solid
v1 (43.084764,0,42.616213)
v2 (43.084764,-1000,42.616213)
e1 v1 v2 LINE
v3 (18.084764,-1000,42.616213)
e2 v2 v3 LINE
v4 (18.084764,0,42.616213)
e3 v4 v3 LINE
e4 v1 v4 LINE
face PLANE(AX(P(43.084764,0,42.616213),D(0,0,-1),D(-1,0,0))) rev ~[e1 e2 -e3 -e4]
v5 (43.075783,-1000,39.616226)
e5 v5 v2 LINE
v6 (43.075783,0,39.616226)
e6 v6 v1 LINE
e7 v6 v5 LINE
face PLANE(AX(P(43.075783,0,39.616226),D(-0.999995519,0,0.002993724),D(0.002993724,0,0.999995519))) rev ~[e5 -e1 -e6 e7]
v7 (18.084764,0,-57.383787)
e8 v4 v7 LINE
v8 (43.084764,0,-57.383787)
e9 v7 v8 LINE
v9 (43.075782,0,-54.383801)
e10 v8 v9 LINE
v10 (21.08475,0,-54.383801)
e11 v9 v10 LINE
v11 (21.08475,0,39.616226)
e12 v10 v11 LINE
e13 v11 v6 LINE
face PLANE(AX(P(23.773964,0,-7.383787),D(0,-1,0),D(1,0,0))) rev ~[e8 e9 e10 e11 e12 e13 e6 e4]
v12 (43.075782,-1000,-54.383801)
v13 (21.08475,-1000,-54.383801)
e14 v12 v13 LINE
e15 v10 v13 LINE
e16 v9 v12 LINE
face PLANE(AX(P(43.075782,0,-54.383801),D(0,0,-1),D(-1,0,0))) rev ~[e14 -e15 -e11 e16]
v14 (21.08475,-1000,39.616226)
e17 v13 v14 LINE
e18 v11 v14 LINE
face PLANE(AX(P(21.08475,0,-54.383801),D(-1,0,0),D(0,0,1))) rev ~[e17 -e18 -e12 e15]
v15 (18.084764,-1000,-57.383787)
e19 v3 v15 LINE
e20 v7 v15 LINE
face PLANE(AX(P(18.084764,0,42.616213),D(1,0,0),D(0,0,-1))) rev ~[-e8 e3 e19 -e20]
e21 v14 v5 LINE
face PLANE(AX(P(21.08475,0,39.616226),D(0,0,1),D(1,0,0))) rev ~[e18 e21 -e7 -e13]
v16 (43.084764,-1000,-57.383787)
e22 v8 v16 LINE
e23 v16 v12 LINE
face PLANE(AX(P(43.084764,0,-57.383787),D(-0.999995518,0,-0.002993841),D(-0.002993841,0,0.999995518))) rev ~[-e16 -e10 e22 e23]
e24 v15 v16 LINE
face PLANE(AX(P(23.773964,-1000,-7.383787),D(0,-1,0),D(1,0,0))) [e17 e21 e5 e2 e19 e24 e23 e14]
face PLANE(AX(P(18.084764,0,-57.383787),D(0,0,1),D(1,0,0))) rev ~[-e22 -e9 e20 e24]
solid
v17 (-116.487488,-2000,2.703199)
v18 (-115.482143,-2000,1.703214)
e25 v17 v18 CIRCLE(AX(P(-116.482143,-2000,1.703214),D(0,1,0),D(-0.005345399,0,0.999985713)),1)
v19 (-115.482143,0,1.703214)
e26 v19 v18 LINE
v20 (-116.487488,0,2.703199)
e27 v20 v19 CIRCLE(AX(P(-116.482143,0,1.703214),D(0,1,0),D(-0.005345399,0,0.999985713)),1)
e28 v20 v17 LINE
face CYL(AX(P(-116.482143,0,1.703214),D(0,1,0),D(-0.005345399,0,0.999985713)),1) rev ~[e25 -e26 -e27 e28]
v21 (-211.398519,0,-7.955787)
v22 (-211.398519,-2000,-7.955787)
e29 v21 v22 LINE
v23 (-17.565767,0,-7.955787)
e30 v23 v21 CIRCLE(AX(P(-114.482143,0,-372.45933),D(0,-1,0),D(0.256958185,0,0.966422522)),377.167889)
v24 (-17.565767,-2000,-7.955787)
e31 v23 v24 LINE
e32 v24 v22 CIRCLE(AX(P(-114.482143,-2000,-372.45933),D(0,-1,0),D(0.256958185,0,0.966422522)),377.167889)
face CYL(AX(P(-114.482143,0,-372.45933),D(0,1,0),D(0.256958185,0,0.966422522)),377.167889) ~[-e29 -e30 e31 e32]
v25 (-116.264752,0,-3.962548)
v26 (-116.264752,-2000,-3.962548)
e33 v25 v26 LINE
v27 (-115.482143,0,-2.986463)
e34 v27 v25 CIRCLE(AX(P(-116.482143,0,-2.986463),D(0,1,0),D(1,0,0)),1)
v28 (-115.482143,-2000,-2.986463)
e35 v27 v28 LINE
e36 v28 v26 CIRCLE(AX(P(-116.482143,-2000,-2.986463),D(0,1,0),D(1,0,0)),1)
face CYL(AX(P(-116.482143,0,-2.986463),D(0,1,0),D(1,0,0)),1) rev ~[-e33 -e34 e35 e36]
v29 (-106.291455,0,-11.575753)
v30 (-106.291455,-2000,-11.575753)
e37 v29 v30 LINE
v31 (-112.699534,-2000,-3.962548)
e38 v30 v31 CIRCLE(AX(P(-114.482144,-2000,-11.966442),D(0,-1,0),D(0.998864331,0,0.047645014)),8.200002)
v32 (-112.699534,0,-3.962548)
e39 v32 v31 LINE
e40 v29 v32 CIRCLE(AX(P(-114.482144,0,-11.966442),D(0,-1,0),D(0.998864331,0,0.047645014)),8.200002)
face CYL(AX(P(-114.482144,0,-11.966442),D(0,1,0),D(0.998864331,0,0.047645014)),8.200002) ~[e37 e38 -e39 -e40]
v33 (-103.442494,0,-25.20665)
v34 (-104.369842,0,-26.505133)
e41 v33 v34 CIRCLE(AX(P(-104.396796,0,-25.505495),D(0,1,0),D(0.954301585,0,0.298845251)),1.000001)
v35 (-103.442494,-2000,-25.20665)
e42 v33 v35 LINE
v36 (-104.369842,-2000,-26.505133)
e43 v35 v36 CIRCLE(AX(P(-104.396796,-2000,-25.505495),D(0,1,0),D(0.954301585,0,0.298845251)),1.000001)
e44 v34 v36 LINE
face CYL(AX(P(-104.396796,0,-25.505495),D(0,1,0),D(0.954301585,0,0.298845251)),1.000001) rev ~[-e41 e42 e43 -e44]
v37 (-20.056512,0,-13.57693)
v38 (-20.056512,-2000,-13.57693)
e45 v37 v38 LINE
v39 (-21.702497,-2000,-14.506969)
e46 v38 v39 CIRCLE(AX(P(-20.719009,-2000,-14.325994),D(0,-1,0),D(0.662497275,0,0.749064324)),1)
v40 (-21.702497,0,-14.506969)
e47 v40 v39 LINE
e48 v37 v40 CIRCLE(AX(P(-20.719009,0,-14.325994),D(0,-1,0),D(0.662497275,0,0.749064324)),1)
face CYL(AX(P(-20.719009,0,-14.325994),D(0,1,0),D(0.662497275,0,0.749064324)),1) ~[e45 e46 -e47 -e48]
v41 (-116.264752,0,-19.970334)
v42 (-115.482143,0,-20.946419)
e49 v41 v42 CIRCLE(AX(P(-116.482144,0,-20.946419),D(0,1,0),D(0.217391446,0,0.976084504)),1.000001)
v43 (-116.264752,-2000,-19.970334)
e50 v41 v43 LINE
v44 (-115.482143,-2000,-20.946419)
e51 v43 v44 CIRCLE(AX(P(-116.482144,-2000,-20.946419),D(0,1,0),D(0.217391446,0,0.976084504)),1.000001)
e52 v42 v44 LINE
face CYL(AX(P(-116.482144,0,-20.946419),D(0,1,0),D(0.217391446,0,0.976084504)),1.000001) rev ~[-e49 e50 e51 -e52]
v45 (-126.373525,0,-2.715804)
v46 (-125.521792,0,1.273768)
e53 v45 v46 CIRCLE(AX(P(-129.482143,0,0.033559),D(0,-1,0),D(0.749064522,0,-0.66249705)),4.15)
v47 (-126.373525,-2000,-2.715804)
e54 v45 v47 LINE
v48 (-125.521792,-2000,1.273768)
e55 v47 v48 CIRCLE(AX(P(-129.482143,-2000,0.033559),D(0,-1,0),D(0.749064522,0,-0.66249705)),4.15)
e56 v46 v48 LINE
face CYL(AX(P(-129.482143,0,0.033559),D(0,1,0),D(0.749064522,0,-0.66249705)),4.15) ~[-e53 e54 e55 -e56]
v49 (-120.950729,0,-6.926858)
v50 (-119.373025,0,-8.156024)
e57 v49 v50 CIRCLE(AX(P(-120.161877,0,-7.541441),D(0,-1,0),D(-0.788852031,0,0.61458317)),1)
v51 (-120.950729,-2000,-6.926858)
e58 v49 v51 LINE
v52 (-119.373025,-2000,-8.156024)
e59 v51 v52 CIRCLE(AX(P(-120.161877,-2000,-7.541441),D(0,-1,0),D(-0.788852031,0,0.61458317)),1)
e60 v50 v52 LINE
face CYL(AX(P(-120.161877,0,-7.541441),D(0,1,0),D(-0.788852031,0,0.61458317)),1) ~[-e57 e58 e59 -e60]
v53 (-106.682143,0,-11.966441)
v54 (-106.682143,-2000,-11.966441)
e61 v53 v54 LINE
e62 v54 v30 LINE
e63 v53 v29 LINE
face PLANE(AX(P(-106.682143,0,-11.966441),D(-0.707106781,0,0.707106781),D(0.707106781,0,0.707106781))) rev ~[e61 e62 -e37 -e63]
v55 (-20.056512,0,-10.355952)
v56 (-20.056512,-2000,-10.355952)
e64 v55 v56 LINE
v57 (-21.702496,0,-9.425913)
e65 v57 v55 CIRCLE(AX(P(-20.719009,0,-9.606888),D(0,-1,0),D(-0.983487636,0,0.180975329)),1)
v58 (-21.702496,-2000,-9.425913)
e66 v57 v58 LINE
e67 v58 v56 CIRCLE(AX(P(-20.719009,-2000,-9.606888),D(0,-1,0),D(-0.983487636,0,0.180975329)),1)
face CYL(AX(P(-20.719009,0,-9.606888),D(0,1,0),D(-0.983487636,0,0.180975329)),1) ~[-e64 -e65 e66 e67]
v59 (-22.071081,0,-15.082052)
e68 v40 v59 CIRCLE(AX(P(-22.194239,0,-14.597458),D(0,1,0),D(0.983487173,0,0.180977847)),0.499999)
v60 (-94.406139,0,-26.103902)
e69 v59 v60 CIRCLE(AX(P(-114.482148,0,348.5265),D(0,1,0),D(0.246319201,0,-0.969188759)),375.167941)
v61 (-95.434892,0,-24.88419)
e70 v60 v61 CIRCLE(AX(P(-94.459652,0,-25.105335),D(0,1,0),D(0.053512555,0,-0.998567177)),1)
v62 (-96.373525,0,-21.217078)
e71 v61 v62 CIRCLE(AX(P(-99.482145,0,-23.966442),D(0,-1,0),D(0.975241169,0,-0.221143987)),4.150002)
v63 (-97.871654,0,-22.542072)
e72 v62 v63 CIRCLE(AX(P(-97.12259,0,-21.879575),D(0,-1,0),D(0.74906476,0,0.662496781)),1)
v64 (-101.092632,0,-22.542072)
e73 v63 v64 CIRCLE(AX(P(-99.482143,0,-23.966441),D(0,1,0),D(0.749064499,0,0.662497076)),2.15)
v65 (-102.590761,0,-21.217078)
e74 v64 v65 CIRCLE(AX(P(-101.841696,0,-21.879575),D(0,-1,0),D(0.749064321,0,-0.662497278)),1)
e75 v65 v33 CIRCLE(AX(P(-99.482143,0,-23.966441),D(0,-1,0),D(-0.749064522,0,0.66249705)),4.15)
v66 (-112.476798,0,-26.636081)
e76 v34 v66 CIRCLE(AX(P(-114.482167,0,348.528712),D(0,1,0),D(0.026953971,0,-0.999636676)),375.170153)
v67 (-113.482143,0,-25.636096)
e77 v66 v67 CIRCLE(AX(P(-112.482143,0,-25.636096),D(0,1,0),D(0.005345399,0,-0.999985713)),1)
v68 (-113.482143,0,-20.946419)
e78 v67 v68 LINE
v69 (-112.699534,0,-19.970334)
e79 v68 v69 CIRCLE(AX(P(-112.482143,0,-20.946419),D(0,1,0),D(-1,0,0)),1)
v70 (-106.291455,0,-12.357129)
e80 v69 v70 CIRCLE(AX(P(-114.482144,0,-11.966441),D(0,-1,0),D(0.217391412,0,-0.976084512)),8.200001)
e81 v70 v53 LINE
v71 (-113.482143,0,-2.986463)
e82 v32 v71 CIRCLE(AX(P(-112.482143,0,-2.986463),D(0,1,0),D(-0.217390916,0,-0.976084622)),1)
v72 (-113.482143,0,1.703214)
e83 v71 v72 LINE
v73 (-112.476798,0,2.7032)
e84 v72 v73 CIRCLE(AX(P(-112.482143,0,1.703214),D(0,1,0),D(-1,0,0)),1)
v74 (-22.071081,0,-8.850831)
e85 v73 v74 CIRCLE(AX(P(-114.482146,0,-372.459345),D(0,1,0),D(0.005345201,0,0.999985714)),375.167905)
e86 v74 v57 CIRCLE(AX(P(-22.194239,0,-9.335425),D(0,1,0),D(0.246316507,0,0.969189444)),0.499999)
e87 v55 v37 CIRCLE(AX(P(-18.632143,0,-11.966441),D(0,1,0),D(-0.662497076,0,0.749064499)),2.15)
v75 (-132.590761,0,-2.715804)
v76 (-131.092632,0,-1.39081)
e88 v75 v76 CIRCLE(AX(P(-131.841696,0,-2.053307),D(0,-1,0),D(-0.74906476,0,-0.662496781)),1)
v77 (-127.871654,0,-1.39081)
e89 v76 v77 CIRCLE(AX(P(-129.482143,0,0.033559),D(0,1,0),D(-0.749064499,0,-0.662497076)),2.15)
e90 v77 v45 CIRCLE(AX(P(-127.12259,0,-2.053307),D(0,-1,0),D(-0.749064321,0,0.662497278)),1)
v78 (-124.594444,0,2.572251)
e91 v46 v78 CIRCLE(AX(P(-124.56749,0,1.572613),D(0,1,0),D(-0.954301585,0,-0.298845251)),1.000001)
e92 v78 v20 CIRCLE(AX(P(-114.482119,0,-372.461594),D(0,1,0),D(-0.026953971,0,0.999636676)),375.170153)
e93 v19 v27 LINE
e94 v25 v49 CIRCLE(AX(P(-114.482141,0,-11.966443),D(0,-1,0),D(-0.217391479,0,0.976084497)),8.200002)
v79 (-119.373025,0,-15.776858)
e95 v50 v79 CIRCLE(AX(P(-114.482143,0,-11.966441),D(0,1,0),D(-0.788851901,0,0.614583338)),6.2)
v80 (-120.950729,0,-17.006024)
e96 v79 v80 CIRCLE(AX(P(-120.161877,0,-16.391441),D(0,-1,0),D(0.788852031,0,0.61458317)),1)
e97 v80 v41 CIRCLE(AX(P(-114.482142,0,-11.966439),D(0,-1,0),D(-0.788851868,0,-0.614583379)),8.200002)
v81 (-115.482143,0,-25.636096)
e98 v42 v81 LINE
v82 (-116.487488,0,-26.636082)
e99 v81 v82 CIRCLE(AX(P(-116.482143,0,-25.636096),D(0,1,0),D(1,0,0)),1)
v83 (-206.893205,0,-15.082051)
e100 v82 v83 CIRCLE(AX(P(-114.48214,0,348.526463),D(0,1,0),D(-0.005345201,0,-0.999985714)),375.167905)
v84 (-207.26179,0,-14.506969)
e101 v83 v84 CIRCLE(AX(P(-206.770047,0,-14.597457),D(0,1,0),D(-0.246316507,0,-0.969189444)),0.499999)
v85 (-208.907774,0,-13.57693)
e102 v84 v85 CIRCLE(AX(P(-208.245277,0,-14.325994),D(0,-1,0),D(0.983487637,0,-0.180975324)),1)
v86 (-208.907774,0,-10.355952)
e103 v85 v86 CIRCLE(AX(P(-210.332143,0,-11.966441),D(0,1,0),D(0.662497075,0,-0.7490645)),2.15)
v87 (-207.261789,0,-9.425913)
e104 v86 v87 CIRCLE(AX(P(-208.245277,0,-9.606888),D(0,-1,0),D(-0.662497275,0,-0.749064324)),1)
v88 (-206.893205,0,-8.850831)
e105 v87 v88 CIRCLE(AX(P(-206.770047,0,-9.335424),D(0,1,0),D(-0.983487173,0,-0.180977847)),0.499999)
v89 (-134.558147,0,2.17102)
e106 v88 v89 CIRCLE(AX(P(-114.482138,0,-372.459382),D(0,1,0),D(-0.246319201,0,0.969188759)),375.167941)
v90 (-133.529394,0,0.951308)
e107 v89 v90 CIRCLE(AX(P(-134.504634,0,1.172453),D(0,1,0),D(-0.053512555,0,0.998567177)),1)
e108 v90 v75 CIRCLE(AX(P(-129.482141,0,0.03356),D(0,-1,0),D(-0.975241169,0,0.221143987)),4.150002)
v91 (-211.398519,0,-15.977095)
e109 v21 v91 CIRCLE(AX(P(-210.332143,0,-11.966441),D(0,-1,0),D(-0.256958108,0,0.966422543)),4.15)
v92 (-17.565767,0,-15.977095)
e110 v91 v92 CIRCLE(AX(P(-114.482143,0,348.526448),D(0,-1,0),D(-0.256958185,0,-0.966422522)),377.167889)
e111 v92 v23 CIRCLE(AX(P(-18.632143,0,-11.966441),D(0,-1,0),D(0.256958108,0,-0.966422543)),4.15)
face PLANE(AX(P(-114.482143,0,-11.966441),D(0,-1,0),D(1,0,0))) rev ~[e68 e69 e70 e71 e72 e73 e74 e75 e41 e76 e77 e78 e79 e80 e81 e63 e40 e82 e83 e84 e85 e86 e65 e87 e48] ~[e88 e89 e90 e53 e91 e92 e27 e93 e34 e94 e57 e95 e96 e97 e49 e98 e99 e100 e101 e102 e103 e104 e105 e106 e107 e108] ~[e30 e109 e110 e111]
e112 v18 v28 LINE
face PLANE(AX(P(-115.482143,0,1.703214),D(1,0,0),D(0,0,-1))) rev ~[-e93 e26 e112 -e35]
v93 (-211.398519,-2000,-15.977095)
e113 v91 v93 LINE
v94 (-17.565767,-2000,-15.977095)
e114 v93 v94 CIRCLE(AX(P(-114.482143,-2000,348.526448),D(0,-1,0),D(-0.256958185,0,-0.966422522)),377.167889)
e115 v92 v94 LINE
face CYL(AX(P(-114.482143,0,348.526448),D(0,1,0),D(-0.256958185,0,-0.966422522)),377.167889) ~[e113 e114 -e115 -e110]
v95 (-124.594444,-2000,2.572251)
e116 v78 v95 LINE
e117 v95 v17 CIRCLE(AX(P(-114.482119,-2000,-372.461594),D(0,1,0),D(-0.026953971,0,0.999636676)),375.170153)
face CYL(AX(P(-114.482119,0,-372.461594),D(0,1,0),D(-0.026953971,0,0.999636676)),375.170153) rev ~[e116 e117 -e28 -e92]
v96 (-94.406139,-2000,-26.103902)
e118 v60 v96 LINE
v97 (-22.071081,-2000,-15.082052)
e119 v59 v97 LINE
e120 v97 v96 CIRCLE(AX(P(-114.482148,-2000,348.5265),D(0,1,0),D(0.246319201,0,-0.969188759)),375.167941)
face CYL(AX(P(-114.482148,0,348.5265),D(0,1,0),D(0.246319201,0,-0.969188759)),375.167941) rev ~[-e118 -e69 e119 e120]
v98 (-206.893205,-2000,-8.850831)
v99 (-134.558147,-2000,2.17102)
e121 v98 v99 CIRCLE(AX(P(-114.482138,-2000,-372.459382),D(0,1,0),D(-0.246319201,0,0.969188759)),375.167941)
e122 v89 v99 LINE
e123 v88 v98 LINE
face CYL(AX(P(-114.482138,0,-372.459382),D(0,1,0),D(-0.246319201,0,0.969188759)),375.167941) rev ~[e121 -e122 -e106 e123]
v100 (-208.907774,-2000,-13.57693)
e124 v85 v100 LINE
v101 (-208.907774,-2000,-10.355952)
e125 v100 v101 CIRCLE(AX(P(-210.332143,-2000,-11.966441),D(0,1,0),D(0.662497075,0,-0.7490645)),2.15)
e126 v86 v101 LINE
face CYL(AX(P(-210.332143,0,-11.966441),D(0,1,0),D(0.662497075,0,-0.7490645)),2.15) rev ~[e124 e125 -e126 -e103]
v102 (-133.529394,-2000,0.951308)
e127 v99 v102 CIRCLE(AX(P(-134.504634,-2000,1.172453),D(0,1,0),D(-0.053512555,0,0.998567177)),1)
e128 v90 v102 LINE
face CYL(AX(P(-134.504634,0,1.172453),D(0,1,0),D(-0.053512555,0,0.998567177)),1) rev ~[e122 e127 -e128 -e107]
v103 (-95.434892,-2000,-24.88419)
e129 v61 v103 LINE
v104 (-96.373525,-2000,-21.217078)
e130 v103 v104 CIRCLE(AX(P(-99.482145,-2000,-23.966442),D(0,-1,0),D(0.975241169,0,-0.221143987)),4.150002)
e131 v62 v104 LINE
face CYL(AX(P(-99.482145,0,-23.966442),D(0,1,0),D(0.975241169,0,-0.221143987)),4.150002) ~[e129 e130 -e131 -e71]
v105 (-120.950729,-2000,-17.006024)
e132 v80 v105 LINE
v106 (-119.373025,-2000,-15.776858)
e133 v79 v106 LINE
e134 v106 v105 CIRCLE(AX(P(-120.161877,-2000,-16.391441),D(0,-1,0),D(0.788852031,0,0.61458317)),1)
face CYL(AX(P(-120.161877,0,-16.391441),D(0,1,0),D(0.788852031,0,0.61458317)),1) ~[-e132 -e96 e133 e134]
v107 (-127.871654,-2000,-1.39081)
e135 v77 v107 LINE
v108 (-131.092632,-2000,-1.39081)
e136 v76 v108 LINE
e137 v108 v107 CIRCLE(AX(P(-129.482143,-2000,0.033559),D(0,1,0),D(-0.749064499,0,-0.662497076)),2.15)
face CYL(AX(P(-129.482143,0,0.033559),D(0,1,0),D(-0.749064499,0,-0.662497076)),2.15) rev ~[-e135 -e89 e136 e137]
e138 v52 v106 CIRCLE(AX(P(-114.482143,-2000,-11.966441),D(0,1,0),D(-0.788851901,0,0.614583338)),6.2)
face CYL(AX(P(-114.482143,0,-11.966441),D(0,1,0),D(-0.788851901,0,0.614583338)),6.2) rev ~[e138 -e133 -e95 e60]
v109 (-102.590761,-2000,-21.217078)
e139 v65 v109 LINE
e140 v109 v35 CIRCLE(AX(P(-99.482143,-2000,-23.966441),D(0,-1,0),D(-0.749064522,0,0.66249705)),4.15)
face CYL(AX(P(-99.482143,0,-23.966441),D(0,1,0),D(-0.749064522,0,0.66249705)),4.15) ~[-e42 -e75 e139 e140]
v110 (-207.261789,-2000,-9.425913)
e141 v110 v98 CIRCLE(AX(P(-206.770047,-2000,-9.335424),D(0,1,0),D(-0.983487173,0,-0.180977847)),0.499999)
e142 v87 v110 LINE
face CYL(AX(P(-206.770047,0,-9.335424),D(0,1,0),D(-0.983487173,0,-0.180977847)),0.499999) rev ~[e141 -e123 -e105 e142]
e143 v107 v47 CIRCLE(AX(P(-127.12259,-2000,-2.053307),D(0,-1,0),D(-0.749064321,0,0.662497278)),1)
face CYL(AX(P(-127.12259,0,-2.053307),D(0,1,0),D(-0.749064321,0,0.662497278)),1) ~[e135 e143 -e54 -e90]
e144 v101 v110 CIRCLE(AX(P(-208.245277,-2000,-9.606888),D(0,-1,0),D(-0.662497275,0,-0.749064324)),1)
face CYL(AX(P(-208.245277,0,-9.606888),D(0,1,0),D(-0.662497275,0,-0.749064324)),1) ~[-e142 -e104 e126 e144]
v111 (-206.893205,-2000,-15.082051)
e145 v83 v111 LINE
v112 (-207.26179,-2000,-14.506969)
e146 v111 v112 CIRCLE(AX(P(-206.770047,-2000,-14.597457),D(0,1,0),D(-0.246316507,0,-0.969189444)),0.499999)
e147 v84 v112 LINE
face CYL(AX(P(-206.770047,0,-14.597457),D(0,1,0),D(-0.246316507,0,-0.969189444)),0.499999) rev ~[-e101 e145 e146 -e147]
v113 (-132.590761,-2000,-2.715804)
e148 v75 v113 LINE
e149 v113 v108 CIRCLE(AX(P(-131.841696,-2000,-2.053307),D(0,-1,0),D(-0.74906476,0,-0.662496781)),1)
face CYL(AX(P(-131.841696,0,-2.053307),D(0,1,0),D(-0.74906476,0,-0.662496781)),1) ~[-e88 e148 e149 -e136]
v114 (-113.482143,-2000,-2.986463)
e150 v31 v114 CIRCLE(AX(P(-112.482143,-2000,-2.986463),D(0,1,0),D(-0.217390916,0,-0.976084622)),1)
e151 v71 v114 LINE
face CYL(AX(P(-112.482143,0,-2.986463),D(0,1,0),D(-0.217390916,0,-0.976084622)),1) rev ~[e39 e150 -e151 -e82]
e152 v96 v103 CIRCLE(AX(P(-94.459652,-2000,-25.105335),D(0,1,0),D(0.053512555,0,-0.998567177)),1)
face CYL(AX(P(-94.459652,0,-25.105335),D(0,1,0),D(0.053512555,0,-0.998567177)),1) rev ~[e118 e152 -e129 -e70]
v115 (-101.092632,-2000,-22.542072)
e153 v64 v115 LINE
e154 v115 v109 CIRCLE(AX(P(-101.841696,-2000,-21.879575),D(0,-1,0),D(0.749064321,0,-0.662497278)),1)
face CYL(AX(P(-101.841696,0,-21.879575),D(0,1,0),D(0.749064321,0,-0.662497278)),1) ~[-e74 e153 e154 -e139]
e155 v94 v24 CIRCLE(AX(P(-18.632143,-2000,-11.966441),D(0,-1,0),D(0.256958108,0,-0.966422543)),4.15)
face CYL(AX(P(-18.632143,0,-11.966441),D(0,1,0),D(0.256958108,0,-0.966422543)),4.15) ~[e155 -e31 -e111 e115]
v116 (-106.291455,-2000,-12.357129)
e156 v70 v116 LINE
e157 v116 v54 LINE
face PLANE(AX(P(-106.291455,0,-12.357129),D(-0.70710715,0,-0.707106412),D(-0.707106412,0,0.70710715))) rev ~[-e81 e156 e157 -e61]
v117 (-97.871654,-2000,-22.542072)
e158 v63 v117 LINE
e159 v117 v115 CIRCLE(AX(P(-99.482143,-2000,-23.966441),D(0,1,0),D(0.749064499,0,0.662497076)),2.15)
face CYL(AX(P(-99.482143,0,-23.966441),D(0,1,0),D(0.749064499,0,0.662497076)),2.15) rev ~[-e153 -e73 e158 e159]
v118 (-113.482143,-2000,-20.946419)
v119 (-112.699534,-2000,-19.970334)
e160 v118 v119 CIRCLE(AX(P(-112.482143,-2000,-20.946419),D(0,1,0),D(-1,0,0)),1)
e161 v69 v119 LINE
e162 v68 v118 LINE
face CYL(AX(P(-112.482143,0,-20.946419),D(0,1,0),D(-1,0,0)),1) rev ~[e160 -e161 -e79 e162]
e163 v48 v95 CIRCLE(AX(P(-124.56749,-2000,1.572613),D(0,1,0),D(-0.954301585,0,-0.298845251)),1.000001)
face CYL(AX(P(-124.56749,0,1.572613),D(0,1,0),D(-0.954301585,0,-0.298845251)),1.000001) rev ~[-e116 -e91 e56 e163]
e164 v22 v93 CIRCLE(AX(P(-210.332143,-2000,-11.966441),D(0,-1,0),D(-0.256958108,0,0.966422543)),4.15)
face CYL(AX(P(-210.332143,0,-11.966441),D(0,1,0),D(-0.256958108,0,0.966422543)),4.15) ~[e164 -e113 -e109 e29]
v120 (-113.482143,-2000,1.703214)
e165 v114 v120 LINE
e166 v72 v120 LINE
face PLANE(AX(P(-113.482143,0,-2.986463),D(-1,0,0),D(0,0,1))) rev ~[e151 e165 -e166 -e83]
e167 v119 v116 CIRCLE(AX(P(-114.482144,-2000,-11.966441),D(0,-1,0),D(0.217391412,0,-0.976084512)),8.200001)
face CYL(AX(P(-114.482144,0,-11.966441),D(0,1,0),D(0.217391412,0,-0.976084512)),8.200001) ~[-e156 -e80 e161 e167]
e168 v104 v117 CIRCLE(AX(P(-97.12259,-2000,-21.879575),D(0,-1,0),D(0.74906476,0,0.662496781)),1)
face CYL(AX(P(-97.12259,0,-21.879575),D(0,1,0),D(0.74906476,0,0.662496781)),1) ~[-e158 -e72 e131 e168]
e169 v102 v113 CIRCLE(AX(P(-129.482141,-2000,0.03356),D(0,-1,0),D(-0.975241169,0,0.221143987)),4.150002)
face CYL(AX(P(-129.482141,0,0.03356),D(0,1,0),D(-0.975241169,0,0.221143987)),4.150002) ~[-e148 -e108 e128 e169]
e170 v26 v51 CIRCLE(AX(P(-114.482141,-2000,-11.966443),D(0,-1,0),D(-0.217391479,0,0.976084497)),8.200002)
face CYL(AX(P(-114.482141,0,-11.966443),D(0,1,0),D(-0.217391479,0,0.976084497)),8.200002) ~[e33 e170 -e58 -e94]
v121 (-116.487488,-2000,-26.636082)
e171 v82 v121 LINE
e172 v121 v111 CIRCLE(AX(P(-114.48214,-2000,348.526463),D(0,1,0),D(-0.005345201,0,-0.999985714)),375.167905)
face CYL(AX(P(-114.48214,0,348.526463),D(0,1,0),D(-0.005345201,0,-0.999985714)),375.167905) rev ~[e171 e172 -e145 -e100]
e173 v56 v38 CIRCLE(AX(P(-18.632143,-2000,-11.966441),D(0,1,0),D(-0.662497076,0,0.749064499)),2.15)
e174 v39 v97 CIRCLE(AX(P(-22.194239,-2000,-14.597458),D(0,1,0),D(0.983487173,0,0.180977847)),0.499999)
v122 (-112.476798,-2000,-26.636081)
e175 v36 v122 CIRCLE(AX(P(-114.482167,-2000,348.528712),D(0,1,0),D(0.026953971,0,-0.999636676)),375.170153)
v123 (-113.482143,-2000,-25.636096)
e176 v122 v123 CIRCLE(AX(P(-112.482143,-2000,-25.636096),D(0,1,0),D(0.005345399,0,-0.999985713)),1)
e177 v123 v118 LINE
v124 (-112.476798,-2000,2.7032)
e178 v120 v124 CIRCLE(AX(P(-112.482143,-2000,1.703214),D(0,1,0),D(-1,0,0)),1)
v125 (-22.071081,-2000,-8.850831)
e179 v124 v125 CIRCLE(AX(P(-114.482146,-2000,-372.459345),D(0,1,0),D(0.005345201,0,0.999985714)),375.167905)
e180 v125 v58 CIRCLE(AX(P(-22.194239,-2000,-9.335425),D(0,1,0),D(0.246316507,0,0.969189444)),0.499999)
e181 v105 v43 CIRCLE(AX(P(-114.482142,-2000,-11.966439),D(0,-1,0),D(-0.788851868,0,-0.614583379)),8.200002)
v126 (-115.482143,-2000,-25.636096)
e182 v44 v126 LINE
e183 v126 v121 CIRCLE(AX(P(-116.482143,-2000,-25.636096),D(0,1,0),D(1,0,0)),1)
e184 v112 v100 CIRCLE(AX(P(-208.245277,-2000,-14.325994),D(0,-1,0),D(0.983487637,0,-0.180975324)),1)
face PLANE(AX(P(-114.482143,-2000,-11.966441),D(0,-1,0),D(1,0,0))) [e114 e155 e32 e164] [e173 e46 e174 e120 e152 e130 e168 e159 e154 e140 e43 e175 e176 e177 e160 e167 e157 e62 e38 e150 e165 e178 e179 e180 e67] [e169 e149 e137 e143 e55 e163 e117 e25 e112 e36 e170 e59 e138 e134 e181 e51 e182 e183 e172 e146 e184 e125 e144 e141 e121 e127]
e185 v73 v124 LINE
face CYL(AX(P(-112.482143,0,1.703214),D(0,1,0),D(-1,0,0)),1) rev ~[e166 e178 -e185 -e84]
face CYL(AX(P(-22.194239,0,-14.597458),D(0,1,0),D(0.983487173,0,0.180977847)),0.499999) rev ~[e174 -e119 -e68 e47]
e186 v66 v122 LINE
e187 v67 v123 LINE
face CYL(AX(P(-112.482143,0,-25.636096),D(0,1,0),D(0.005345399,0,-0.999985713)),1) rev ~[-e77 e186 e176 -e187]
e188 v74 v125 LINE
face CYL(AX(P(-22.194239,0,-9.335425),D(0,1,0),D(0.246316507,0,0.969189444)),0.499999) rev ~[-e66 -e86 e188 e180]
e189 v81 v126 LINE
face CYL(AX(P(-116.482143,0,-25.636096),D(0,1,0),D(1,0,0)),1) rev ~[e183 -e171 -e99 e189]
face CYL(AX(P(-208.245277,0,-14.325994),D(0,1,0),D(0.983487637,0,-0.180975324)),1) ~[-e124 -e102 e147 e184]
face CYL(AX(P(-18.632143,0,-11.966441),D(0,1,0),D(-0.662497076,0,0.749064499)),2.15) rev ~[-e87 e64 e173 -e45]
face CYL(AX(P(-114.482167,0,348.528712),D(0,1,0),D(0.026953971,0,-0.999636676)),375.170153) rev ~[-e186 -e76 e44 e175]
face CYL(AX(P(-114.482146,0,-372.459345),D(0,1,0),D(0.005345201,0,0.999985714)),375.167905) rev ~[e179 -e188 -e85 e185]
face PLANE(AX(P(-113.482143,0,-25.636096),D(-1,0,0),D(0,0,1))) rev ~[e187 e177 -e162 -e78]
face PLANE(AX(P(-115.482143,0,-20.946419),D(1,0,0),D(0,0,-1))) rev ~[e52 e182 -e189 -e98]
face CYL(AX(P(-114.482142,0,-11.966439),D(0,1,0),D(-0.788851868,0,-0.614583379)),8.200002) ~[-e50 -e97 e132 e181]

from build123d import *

# Parameters (mm, degrees)
F1_DEPTH = 2000
F3_DEPTH = 1000


# Not quite as in the source:
# - ends of sketch curves that miss each other by under 0.0002 mm in the source are joined


with BuildPart() as f1:
    # F0 (on Front) → F1 (new body)
    with BuildSketch(Plane.XZ):
        with BuildLine():
            ThreePointArc((-17.5657668552, -7.9557874553), (-114.482143, 4.708559), (-211.3985191448, -7.9557874553))
            ThreePointArc((-211.3985191468, -7.9557874481), (-214.482143, -11.966441), (-211.3985191468, -15.9770945519))
            ThreePointArc((-211.3985191448, -15.9770945447), (-114.482143, -28.641441), (-17.5657668552, -15.9770945447))
            ThreePointArc((-17.5657668532, -15.9770945519), (-14.482143, -11.966441), (-17.5657668532, -7.9557874481))
        make_face()
        with BuildLine():
            ThreePointArc((-208.9077742877, -13.5769296747), (-212.482143, -11.966441), (-208.9077742877, -10.3559523253))
            ThreePointArc((-208.9077742877, -10.3559523253), (-207.7533400412, -10.4775188222), (-207.2617892935, -9.425913054))
            ThreePointArc((-207.2617892935, -9.425913054), (-207.1910048941, -9.0656220914), (-206.8932051271, -8.8508305))
            ThreePointArc((-206.8932051271, -8.8508305), (-170.9950203177, -1.5722317693), (-134.5581469899, 2.1710198123))
            ThreePointArc((-134.5581469899, 2.1710198123), (-133.7402264674, 1.8171851888), (-133.5293940092, 0.9513082288))
            ThreePointArc((-133.5293940092, 0.9513082288), (-133.5025335267, -0.9954988279), (-132.5907607495, -2.7158037784))
            ThreePointArc((-132.5907607495, -2.7158037784), (-131.1791989669, -2.8023715374), (-131.0926316821, -1.3908097188))
            ThreePointArc((-131.0926316821, -1.3908097188), (-129.482143, 2.183559), (-127.8716543253, -1.3908097123))
            ThreePointArc((-127.8716543253, -1.3908097123), (-127.7850870331, -2.8023715374), (-126.3735252432, -2.7158037849))
            ThreePointArc((-126.3735252432, -2.7158037849), (-125.4236024617, -0.8328985575), (-125.5217918168, 1.2737680574))
            ThreePointArc((-125.5217918168, 1.2737680574), (-125.3812649978, 2.1537940521), (-124.5944440182, 2.5722506744))
            ThreePointArc((-124.5944440182, 2.5722506744), (-120.5413197711, 2.6596262173), (-116.4874880026, 2.7031994831))
            ThreePointArc((-116.4874880026, 2.7031994831), (-115.776928495, 2.412208007), (-115.482143, 1.703214))
            Line((-115.482143, 1.703214), (-115.482143, -2.986463))
            ThreePointArc((-115.482143, -2.986463), (-115.7019536269, -3.6120063974), (-116.2647520841, -3.9625476222))
            ThreePointArc((-116.2647520841, -3.9625476222), (-118.8659014588, -5.03660249), (-120.9507289205, -6.926858062))
            ThreePointArc((-120.9507289205, -6.926858062), (-120.7764600793, -8.3302931018), (-119.3730248982, -8.1560240793))
            ThreePointArc((-119.3730248982, -8.1560240793), (-108.282143, -11.966441), (-119.3730247168, -15.7768577794))
            ThreePointArc((-119.3730247168, -15.7768577794), (-120.7764600793, -15.6025888982), (-120.9507291018, -17.0060240793))
            ThreePointArc((-120.9507291018, -17.0060240793), (-118.8659014588, -18.89627951), (-116.2647520265, -19.9703341189))
            ThreePointArc((-116.2647520265, -19.9703341189), (-115.7019536269, -20.3208756026), (-115.482143, -20.946419))
            Line((-115.482143, -20.946419), (-115.482143, -25.636096))
            ThreePointArc((-115.482143, -25.636096), (-115.776928495, -26.345090007), (-116.4874880038, -26.6360817154))
            ThreePointArc((-116.4874880038, -26.6360817154), (-162.0425086737, -23.6145958983), (-206.8932050038, -15.0820510151))
            ThreePointArc((-206.8932050038, -15.0820510151), (-207.1910048941, -14.8672599086), (-207.2617897315, -14.5069688654))
            ThreePointArc((-207.2617897315, -14.5069688654), (-207.7533400412, -13.4553631778), (-208.9077742877, -13.5769296747))
        make_face(mode=Mode.SUBTRACT)
        with BuildLine():
            ThreePointArc((-112.6995339159, -3.9625476222), (-113.2623323731, -3.6120063974), (-113.482143, -2.986463))
            Line((-113.482143, -2.986463), (-113.482143, 1.703214))
            ThreePointArc((-113.482143, 1.703214), (-113.187357505, 2.412208007), (-112.4767979962, 2.7031997154))
            ThreePointArc((-112.4767979962, 2.7031997154), (-66.9217773263, -0.3182861017), (-22.0710809962, -8.8508309849))
            ThreePointArc((-22.0710809962, -8.8508309849), (-21.7732811059, -9.0656220914), (-21.7024962685, -9.4259131346))
            ThreePointArc((-21.7024962685, -9.4259131346), (-21.2109459588, -10.4775188222), (-20.0565117188, -10.3559523179))
            ThreePointArc((-20.0565117188, -10.3559523179), (-16.482143, -11.966441), (-20.0565117123, -13.5769296747))
            ThreePointArc((-20.0565117123, -13.5769296747), (-21.2109459588, -13.4553631778), (-21.7024967065, -14.506968946))
            ThreePointArc((-21.7024967065, -14.506968946), (-21.7732811059, -14.8672599086), (-22.0710808729, -15.0820515))
            ThreePointArc((-22.0710808729, -15.0820515), (-57.9692656823, -22.3606502307), (-94.4061390101, -26.1039018123))
            ThreePointArc((-94.4061390101, -26.1039018123), (-95.2240595326, -25.7500671888), (-95.4348919908, -24.8841902288))
            ThreePointArc((-95.4348919908, -24.8841902288), (-95.4617524733, -22.9373831721), (-96.3735252505, -21.2170782216))
            ThreePointArc((-96.3735252505, -21.2170782216), (-97.7850870331, -21.1305104626), (-97.8716543179, -22.5420722812))
            ThreePointArc((-97.8716543179, -22.5420722812), (-99.482143, -26.116441), (-101.0926316747, -22.5420722877))
            ThreePointArc((-101.0926316747, -22.5420722877), (-101.1791989669, -21.1305104626), (-102.5907607568, -21.2170782151))
            ThreePointArc((-102.5907607568, -21.2170782151), (-103.5406835383, -23.0999834425), (-103.4424941832, -25.2066500574))
            ThreePointArc((-103.4424941832, -25.2066500574), (-103.5830210022, -26.0866760521), (-104.3698419818, -26.5051326744))
            ThreePointArc((-104.3698419818, -26.5051326744), (-108.4229662289, -26.5925082173), (-112.4767979974, -26.6360814831))
            ThreePointArc((-112.4767979974, -26.6360814831), (-113.187357505, -26.345090007), (-113.482143, -25.636096))
            Line((-113.482143, -25.636096), (-113.482143, -20.946419))
            ThreePointArc((-113.482143, -20.946419), (-113.2623323731, -20.3208756026), (-112.6995339159, -19.9703343778))
            ThreePointArc((-112.6995339159, -19.9703343778), (-108.2086364539, -17.2468875357), (-106.291455428, -12.3571289796))
            Line((-106.291455428, -12.3571289796), (-106.682143, -11.966441))
            Line((-106.682143, -11.966441), (-106.291455, -11.575753))
            ThreePointArc((-106.291455, -11.575753), (-108.2086364539, -6.6859944643), (-112.6995339159, -3.9625476222))
        make_face(mode=Mode.SUBTRACT)
    extrude(amount=F1_DEPTH)


with BuildPart() as f3:
    # F2 (on Front) → F3 (new body)
    with BuildSketch(Plane.XZ):
        Polygon((43.0757822734, 42.6162129075), (18.084763796, 42.6162129075), (18.084763796, -57.3837870925), (43.0757822734, -57.3837870925), (43.084763796, -57.3837870925), (43.0757822733, -54.3838005361), (21.0847503524, -54.3838005361), (21.0847503524, 39.6162263511), (43.0757826234, 39.6162263511), (43.084763796, 42.6162129075), align=None)
    extrude(amount=F3_DEPTH)


solid = Compound([f1.part, f3.part])
